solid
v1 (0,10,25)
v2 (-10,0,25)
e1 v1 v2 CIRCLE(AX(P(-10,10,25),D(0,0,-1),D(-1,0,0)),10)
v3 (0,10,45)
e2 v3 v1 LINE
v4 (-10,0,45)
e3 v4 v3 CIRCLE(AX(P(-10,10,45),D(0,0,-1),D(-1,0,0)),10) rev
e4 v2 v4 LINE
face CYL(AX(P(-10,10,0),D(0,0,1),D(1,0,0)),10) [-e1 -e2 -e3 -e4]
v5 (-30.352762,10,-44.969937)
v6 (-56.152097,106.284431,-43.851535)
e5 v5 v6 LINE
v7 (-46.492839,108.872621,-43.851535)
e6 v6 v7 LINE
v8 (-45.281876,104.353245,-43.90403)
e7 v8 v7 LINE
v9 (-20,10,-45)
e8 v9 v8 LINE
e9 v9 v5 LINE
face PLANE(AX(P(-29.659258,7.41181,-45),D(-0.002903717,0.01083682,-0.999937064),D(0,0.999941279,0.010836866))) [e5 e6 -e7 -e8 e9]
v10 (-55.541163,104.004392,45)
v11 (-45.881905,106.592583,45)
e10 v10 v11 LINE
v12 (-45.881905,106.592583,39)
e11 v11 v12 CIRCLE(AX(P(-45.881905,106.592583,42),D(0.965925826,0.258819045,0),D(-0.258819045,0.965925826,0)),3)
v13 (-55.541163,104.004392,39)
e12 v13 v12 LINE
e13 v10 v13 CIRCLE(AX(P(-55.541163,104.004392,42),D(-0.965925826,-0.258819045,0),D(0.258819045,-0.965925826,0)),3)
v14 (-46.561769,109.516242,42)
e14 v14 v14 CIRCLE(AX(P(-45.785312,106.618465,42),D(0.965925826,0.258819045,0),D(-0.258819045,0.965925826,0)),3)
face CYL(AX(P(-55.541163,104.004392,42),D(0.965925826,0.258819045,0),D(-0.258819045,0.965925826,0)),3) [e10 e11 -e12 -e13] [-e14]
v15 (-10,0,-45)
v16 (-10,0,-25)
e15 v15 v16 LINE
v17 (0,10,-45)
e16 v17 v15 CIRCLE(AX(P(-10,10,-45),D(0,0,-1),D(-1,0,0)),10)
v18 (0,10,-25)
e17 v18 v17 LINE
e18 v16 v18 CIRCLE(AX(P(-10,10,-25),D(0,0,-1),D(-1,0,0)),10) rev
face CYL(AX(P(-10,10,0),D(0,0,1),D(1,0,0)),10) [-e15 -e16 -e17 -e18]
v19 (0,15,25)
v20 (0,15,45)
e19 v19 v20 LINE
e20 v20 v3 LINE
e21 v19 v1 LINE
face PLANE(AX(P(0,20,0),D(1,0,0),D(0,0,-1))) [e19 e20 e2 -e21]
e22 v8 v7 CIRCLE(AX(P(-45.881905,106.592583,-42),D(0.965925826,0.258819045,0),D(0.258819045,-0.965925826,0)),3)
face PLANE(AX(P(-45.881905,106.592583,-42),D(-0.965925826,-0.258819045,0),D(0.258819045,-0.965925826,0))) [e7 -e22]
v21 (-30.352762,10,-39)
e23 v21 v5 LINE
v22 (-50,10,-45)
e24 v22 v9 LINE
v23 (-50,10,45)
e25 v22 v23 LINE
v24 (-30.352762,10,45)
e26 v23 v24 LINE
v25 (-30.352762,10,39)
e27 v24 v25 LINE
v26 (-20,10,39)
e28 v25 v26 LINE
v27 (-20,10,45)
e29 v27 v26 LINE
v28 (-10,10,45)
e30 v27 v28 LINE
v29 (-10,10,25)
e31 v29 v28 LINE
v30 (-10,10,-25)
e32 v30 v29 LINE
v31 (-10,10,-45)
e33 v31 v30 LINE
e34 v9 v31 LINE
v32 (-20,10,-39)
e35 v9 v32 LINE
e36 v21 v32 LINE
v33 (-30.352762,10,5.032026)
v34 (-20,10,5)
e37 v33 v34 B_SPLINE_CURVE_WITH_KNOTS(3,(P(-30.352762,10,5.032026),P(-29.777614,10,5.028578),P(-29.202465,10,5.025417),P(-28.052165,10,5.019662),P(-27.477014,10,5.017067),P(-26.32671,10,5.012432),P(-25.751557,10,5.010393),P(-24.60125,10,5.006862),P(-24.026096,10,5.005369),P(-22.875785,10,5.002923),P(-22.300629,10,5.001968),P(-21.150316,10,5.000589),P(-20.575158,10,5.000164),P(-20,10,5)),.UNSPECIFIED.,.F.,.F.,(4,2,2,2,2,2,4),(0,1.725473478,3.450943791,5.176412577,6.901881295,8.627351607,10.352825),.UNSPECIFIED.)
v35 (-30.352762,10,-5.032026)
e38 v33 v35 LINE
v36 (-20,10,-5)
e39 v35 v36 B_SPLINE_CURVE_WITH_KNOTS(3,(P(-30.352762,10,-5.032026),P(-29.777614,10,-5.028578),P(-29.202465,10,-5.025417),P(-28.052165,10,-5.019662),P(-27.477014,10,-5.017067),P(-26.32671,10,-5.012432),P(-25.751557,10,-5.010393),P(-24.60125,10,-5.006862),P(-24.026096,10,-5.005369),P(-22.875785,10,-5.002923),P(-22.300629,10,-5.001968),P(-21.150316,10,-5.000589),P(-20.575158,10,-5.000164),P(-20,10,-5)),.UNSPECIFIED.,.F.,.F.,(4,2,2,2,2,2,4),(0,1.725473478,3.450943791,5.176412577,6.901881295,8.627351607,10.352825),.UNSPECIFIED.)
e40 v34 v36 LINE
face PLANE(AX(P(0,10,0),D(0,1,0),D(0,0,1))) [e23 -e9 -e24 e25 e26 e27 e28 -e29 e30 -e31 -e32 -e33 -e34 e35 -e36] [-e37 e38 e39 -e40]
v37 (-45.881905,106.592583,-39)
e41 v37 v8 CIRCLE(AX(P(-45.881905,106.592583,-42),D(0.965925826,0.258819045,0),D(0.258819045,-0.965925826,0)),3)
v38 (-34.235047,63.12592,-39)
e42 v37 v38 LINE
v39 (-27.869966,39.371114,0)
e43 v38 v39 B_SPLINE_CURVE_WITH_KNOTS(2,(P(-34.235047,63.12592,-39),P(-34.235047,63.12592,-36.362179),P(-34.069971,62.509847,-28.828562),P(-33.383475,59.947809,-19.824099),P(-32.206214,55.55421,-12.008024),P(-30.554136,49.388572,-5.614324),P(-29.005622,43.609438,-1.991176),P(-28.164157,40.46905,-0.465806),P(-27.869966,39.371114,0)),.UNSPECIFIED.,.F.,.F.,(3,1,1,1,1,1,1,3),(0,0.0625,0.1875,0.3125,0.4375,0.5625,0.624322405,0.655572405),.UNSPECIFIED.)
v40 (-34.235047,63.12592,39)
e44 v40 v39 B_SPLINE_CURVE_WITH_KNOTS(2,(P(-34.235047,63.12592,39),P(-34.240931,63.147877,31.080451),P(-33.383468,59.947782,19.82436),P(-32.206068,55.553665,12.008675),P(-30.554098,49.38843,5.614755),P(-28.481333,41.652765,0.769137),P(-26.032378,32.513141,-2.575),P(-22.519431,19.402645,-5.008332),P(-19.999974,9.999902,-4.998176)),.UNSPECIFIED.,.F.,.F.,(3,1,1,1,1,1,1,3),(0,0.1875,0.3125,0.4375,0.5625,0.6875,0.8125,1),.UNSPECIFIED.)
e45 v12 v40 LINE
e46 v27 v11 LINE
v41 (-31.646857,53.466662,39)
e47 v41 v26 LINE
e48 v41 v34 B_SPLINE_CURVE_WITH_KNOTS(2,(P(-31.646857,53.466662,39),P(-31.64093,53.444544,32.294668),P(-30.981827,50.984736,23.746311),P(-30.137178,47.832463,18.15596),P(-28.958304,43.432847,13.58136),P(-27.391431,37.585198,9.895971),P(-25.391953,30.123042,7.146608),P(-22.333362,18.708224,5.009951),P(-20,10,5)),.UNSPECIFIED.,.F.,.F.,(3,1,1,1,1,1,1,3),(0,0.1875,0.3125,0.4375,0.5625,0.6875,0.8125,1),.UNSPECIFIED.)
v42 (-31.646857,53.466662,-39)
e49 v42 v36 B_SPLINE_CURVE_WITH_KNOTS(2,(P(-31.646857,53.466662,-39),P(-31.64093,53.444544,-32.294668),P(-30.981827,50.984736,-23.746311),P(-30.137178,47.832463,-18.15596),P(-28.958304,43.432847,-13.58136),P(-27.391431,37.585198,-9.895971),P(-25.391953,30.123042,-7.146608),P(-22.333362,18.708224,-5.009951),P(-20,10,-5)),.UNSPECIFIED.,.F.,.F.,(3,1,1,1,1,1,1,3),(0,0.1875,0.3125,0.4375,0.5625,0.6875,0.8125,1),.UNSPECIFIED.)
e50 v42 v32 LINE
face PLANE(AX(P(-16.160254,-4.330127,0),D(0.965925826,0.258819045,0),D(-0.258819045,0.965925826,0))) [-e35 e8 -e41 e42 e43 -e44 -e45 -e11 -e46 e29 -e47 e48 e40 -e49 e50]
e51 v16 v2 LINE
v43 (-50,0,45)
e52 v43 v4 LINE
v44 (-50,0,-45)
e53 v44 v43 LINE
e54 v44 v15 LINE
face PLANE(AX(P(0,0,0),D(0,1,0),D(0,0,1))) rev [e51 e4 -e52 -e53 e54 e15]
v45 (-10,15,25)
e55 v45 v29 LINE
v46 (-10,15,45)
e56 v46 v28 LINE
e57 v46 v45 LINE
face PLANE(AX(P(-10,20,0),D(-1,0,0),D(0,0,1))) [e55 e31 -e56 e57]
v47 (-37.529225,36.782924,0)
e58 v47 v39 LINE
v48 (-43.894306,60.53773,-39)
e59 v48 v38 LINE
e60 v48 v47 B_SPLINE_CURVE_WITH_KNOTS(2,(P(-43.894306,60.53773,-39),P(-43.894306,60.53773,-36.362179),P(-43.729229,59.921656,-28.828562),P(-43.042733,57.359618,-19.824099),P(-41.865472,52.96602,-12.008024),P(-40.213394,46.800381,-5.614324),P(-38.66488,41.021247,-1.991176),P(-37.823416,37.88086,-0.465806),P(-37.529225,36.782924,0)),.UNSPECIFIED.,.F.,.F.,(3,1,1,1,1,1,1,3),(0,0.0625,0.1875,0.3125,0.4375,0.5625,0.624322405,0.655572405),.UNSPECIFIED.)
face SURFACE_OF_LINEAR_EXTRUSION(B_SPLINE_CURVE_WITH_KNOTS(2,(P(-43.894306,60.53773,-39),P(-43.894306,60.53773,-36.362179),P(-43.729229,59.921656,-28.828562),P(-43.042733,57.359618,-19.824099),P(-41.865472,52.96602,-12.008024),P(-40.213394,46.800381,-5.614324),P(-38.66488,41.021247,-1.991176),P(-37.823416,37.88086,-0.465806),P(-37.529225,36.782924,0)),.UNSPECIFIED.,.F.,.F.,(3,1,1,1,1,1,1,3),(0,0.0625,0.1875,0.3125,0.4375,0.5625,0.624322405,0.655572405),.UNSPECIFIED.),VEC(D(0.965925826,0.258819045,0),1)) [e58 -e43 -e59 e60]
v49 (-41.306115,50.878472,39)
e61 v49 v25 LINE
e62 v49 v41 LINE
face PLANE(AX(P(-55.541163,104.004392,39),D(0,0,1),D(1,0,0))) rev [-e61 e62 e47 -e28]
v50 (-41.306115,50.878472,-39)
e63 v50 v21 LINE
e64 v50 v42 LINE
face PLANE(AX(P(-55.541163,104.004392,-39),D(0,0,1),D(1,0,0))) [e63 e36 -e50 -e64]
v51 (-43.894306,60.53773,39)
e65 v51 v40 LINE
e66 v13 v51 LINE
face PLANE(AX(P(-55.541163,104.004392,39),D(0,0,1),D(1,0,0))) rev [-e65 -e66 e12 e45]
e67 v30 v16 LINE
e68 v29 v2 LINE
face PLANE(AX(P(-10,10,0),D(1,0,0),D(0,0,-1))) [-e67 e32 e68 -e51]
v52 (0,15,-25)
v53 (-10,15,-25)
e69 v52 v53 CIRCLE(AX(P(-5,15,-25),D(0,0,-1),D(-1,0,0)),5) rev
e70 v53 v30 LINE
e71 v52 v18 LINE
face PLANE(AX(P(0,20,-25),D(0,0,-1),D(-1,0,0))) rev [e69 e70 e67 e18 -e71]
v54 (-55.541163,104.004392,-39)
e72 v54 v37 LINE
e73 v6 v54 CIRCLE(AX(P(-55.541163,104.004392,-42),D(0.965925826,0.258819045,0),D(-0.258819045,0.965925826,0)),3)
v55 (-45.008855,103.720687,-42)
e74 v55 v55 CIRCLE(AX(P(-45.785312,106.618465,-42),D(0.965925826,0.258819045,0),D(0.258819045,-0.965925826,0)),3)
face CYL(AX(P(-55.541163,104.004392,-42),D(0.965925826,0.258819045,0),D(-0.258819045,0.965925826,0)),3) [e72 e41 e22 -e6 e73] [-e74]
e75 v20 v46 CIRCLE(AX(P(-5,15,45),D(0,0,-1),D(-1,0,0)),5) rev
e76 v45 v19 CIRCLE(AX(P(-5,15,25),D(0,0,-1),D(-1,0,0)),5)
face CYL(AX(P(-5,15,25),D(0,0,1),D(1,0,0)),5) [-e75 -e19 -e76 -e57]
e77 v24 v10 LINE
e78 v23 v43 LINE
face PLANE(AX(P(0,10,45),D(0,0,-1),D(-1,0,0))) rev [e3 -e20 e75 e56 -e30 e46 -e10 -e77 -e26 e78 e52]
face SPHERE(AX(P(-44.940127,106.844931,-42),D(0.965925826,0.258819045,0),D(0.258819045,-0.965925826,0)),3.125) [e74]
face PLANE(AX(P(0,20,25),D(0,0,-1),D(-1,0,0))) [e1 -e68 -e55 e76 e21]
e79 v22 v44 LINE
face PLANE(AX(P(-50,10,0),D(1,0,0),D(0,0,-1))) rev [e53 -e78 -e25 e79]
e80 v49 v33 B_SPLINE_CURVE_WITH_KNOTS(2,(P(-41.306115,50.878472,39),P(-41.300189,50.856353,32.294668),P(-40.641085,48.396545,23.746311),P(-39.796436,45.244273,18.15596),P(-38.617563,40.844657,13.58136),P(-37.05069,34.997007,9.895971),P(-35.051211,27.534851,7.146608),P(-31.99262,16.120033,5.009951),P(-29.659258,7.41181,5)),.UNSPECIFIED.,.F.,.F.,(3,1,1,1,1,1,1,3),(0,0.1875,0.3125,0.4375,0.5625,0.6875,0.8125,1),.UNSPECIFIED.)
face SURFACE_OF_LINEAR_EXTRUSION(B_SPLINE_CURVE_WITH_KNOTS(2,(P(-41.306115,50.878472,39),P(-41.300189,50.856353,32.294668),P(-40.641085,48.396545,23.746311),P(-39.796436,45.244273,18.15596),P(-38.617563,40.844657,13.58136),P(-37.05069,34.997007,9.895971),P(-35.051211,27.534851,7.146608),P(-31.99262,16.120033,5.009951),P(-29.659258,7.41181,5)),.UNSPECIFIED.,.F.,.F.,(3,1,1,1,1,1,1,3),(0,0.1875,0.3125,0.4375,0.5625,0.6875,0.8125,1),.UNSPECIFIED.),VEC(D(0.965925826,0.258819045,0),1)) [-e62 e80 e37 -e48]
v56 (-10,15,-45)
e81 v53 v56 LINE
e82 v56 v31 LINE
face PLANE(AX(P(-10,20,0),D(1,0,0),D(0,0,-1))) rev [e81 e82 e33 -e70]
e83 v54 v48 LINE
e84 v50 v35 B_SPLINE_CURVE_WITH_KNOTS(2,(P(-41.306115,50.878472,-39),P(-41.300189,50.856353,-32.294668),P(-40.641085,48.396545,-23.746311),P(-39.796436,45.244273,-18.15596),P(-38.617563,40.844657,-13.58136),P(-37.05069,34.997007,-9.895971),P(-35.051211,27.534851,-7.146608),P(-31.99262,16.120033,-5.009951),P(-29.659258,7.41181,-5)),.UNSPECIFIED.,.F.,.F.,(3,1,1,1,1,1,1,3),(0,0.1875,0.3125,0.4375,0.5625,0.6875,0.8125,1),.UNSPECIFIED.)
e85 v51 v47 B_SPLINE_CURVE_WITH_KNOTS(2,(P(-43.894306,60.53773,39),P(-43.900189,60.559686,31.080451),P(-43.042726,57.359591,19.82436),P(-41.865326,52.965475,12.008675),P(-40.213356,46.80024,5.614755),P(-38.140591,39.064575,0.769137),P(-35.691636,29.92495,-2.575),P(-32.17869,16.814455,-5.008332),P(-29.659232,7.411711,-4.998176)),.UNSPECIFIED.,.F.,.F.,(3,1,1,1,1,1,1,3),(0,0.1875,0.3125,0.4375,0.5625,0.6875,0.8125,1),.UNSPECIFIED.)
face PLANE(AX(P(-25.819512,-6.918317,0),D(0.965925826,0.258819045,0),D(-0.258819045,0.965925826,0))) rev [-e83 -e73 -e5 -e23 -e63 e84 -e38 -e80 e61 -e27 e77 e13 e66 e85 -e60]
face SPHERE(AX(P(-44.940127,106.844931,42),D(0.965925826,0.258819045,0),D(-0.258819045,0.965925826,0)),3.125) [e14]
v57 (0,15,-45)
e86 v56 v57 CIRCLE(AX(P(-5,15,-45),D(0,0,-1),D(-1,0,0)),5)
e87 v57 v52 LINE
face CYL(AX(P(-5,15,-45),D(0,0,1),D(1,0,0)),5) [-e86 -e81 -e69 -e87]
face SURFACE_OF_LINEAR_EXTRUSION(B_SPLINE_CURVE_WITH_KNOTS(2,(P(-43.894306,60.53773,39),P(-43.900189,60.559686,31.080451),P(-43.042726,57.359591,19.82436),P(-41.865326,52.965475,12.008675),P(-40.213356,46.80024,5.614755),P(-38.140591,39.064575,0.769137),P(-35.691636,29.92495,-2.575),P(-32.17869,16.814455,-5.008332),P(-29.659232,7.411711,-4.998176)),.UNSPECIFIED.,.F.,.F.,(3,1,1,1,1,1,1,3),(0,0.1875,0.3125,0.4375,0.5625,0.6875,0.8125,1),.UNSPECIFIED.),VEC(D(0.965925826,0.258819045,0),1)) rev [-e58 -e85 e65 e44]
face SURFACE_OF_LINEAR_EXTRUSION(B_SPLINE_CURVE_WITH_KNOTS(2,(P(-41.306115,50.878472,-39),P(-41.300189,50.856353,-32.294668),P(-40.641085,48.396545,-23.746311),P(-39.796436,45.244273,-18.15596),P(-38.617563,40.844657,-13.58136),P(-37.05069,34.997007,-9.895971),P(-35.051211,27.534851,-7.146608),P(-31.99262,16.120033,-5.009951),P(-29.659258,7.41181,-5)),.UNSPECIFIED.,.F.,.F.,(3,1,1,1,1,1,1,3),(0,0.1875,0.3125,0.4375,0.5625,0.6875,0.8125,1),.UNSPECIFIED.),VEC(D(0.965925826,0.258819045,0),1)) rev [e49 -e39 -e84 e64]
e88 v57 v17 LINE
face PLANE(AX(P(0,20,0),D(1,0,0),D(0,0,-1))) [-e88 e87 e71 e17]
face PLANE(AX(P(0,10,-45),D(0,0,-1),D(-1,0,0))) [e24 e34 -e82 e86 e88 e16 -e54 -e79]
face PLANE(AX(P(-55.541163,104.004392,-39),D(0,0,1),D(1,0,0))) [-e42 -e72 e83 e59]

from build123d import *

# Parameters (mm, degrees)
BOSS_EXTRUDE1_DEPTH = 10
SKETCH2_3_W         = 10
SKETCH2_3_H         = 20
BOSS_EXTRUDE2_DEPTH = 20
BOSS_EXTRUDE3_START = -10
BOSS_EXTRUDE3_DEPTH = 10
SKETCH8_R           = 3
BOSS_EXTRUDE5_DEPTH = 0.1
DOME2_FACE_RADIUS   = 3
DOME2_HEIGHT        = 4
DOME3_FACE_RADIUS   = 3
DOME3_HEIGHT        = 4
FILLET1_RADIUS      = 5
FILLET1_LENGTH      = 20
FILLET2_RADIUS      = 5
FILLET2_LENGTH      = 20
FILLET3_R           = 10
FILLET4_R           = 10


# Read off the part's stored shape, not the designer's step: Boss-Extrude3
with BuildPart() as part:
    # Sketch2 → Boss-Extrude1 (new body)
    with BuildSketch(Plane(origin=(0, 0, 0), x_dir=(1, 0, 0), z_dir=(0, 1, 0))):
        Polygon((-10, 45), (-50, 45), (-50, -45), (-10, -45), (-10, -25), (-10, 25), align=None)
    extrude(amount=BOSS_EXTRUDE1_DEPTH)

    # Sketch2<3> → Boss-Extrude2 (add)
    with BuildSketch(Plane(origin=(0, 0, 0), x_dir=(1, 0, 0), z_dir=(0, 1, 0))):
        with Locations((-5, -35)):
            Rectangle(SKETCH2_3_W, SKETCH2_3_H)
        with Locations((-5, 35)):
            Rectangle(SKETCH2_3_W, SKETCH2_3_H)
    extrude(amount=BOSS_EXTRUDE2_DEPTH)

    # Boss-Extrude3 outline → Boss-Extrude3 (add)
    with BuildSketch(Plane(origin=(-16.160254038, -4.330127019, 0), x_dir=(0, 0, -1), z_dir=(0.9659258262890681, 0.25881904510252135, 0)).offset(BOSS_EXTRUDE3_START)):
        with BuildLine():
            Line((-45, 114.835639165), (-45, 14.835639165))
            Line((-45, 14.835639165), (-39, 14.835639165))
            Line((-39, 14.835639165), (-39, 59.835639165))
            Line((-39, 59.835639165), (-39, 69.835639165))
            Line((-39, 69.835639165), (-39, 114.835639165))
            ThreePointArc((-39, 114.835639165), (-42, 117.835639165), (-45, 114.835639165))
        make_face()
        with BuildLine():
            Line((-39, 69.835639165), (-39, 59.835639165))
            add(Edge.make_bspline(
                [(-39, 59.835639165), (-32.29466778, 59.812740608), (-23.746310881, 57.26615983), (-18.155959882, 54.002687415), (-13.581360263, 49.447869434), (-9.895970778, 43.393937355), (-7.1466079, 35.668544709), (-5.009950643, 23.851055873), (-5, 14.835639165)],
                knots=[0, 0, 0, 0.1875, 0.3125, 0.4375, 0.5625, 0.6875, 0.8125, 1, 1, 1], degree=2))
            Line((-5, 14.835639165), (5, 14.835639165))
            add(Edge.make_bspline(
                [(0.000646167, 45.244430902), (0.476875904, 44.083141287), (2.5762954, 38.143358621), (5.009950643, 24.570222457), (5, 14.835639165)],
                knots=[0.655563959, 0.655563959, 0.655563959, 0.6875, 0.8125, 1, 1, 1], degree=2))
            add(Edge.make_bspline(
                [(0.000646167, 45.244430902), (0.000323073, 45.243642557), (0, 45.24285419)],
                knots=[0.655550731, 0.655550731, 0.655550731, 0.655572405, 0.655572405, 0.655572405], degree=2))
            add(Edge.make_bspline(
                [(-39, 69.835639165), (-31.080450951, 69.858370058), (-19.824359781, 66.54538789), (-12.00867454, 61.996263654), (-5.614755257, 55.613542625), (-1.387837079, 48.627543749), (0, 45.24285419)],
                knots=[0, 0, 0, 0.1875, 0.3125, 0.4375, 0.5625, 0.655579399, 0.655579399, 0.655579399], degree=2))
        make_face()
        with BuildLine():
            add(Edge.make_bspline(
                [(39, 69.835639165), (36.362179487, 69.835639165), (28.828562218, 69.197832663), (19.824098622, 66.545415855), (12.008024479, 61.996828001), (5.61432407, 55.613689023), (1.991176128, 49.630689625), (0.466161192, 46.380278102), (0.000646167, 45.244430902)],
                knots=[0, 0, 0, 0.0625, 0.1875, 0.3125, 0.4375, 0.5625, 0.624322405, 0.655550731, 0.655550731, 0.655550731], degree=2))
            add(Edge.make_bspline(
                [(0.000646167, 45.244430902), (0.476875904, 44.083141287), (2.5762954, 38.143358621), (5.009950643, 24.570222457), (5, 14.835639165)],
                knots=[0.655563959, 0.655563959, 0.655563959, 0.6875, 0.8125, 1, 1, 1], degree=2))
            add(Edge.make_bspline(
                [(39, 59.835639165), (32.29466778, 59.812740608), (23.746310881, 57.26615983), (18.155959882, 54.002687415), (13.581360263, 49.447869434), (9.895970778, 43.393937355), (7.1466079, 35.668544709), (5.009950643, 23.851055873), (5, 14.835639165)],
                knots=[0, 0, 0, 0.1875, 0.3125, 0.4375, 0.5625, 0.6875, 0.8125, 1, 1, 1], degree=2))
            Line((39, 59.835639165), (39, 69.835639165))
        make_face()
        with BuildLine():
            Line((39, 114.835639165), (39, 69.835639165))
            Line((39, 69.835639165), (39, 59.835639165))
            Line((39, 59.835639165), (39, 14.835639165))
            Line((39, 14.835639165), (45, 14.835639165))
            Line((45, 14.835639165), (43.851535226, 117.196108886))
            ThreePointArc((43.851535226, 117.196108886), (40.687484415, 117.533286814), (39, 114.835639165))
        make_face()
    extrude(amount=BOSS_EXTRUDE3_DEPTH)

    # Sketch8 → Boss-Extrude5 (add)
    with BuildSketch(Plane(origin=(-16.160254038, -4.330127019, 0), x_dir=(0, 0, -1), z_dir=(0.9659258262890682, 0.2588190451025214, 0))):
        with Locations(Location((-42, 114.835639165, 0), (0, 0, 90))):
            Circle(SKETCH8_R)
        with Locations(Location((42, 114.835639165, 0), (0, 0, 51.889621563))):
            Circle(SKETCH8_R)
    extrude(amount=BOSS_EXTRUDE5_DEPTH)

    # Dome2: a dome of height H over a round flat face of radius A is a cap of a sphere of radius (A * A + H * H) / (2 * H)
    dome2_r = (DOME2_FACE_RADIUS * DOME2_FACE_RADIUS + DOME2_HEIGHT * DOME2_HEIGHT) / (2 * DOME2_HEIGHT)
    dome2_base = Plane((-45.785311928, 106.618464533, 42), z_dir=(0.965925826289, 0.258819045103, 0))
    with Locations(dome2_base.offset(DOME2_HEIGHT - dome2_r)):
        dome2_ball = Sphere(dome2_r, mode=Mode.PRIVATE)
    add(split(dome2_ball, bisect_by=dome2_base, keep=Keep.TOP, mode=Mode.PRIVATE))

    # Dome3: a dome of height H over a round flat face of radius A is a cap of a sphere of radius (A * A + H * H) / (2 * H)
    dome3_r = (DOME3_FACE_RADIUS * DOME3_FACE_RADIUS + DOME3_HEIGHT * DOME3_HEIGHT) / (2 * DOME3_HEIGHT)
    dome3_base = Plane((-45.785311928, 106.618464533, -42), z_dir=(0.965925826289, 0.258819045103, 0))
    with Locations(dome3_base.offset(DOME3_HEIGHT - dome3_r)):
        dome3_ball = Sphere(dome3_r, mode=Mode.PRIVATE)
    add(split(dome3_ball, bisect_by=dome3_base, keep=Keep.TOP, mode=Mode.PRIVATE))

    # Fillet1: full round fillet: the end face becomes a half cylinder, R = half its width
    fillet1_face = Plane((-5, 20, -35), x_dir=(0, 0, -1), z_dir=(0, 1, 0))  # on the end face: x along it, z out of the body
    fillet1_slab = fillet1_face.offset(-FILLET1_RADIUS / 2) * Box(FILLET1_LENGTH, 2 * FILLET1_RADIUS, FILLET1_RADIUS, mode=Mode.PRIVATE)  # the body's end, R deep
    fillet1_round = Plane((-5, 15, -35), x_dir=(0, 1, 0), z_dir=(0, 0, -1)) * Cylinder(FILLET1_RADIUS, FILLET1_LENGTH, mode=Mode.PRIVATE)  # its axis R under the face
    add(fillet1_slab - fillet1_round, mode=Mode.SUBTRACT)

    # Fillet2: full round fillet: the end face becomes a half cylinder, R = half its width
    fillet2_face = Plane((-5, 20, 35), x_dir=(0, 0, 1), z_dir=(0, 1, 0))  # on the end face: x along it, z out of the body
    fillet2_slab = fillet2_face.offset(-FILLET2_RADIUS / 2) * Box(FILLET2_LENGTH, 2 * FILLET2_RADIUS, FILLET2_RADIUS, mode=Mode.PRIVATE)  # the body's end, R deep
    fillet2_round = Plane((-5, 15, 35), x_dir=(0, 1, 0), z_dir=(0, 0, 1)) * Cylinder(FILLET2_RADIUS, FILLET2_LENGTH, mode=Mode.PRIVATE)  # its axis R under the face
    add(fillet2_slab - fillet2_round, mode=Mode.SUBTRACT)

    # Fillet3
    fillet3_edges = [part.edges().sort_by_distance(p)[0] for p in [
        (0, 0, 35),
    ]]
    fillet(fillet3_edges, radius=FILLET3_R)

    # Fillet4
    fillet4_edges = [part.edges().sort_by_distance(p)[0] for p in [
        (0, 0, -35),
    ]]
    fillet(fillet4_edges, radius=FILLET4_R)


solid = part.part
